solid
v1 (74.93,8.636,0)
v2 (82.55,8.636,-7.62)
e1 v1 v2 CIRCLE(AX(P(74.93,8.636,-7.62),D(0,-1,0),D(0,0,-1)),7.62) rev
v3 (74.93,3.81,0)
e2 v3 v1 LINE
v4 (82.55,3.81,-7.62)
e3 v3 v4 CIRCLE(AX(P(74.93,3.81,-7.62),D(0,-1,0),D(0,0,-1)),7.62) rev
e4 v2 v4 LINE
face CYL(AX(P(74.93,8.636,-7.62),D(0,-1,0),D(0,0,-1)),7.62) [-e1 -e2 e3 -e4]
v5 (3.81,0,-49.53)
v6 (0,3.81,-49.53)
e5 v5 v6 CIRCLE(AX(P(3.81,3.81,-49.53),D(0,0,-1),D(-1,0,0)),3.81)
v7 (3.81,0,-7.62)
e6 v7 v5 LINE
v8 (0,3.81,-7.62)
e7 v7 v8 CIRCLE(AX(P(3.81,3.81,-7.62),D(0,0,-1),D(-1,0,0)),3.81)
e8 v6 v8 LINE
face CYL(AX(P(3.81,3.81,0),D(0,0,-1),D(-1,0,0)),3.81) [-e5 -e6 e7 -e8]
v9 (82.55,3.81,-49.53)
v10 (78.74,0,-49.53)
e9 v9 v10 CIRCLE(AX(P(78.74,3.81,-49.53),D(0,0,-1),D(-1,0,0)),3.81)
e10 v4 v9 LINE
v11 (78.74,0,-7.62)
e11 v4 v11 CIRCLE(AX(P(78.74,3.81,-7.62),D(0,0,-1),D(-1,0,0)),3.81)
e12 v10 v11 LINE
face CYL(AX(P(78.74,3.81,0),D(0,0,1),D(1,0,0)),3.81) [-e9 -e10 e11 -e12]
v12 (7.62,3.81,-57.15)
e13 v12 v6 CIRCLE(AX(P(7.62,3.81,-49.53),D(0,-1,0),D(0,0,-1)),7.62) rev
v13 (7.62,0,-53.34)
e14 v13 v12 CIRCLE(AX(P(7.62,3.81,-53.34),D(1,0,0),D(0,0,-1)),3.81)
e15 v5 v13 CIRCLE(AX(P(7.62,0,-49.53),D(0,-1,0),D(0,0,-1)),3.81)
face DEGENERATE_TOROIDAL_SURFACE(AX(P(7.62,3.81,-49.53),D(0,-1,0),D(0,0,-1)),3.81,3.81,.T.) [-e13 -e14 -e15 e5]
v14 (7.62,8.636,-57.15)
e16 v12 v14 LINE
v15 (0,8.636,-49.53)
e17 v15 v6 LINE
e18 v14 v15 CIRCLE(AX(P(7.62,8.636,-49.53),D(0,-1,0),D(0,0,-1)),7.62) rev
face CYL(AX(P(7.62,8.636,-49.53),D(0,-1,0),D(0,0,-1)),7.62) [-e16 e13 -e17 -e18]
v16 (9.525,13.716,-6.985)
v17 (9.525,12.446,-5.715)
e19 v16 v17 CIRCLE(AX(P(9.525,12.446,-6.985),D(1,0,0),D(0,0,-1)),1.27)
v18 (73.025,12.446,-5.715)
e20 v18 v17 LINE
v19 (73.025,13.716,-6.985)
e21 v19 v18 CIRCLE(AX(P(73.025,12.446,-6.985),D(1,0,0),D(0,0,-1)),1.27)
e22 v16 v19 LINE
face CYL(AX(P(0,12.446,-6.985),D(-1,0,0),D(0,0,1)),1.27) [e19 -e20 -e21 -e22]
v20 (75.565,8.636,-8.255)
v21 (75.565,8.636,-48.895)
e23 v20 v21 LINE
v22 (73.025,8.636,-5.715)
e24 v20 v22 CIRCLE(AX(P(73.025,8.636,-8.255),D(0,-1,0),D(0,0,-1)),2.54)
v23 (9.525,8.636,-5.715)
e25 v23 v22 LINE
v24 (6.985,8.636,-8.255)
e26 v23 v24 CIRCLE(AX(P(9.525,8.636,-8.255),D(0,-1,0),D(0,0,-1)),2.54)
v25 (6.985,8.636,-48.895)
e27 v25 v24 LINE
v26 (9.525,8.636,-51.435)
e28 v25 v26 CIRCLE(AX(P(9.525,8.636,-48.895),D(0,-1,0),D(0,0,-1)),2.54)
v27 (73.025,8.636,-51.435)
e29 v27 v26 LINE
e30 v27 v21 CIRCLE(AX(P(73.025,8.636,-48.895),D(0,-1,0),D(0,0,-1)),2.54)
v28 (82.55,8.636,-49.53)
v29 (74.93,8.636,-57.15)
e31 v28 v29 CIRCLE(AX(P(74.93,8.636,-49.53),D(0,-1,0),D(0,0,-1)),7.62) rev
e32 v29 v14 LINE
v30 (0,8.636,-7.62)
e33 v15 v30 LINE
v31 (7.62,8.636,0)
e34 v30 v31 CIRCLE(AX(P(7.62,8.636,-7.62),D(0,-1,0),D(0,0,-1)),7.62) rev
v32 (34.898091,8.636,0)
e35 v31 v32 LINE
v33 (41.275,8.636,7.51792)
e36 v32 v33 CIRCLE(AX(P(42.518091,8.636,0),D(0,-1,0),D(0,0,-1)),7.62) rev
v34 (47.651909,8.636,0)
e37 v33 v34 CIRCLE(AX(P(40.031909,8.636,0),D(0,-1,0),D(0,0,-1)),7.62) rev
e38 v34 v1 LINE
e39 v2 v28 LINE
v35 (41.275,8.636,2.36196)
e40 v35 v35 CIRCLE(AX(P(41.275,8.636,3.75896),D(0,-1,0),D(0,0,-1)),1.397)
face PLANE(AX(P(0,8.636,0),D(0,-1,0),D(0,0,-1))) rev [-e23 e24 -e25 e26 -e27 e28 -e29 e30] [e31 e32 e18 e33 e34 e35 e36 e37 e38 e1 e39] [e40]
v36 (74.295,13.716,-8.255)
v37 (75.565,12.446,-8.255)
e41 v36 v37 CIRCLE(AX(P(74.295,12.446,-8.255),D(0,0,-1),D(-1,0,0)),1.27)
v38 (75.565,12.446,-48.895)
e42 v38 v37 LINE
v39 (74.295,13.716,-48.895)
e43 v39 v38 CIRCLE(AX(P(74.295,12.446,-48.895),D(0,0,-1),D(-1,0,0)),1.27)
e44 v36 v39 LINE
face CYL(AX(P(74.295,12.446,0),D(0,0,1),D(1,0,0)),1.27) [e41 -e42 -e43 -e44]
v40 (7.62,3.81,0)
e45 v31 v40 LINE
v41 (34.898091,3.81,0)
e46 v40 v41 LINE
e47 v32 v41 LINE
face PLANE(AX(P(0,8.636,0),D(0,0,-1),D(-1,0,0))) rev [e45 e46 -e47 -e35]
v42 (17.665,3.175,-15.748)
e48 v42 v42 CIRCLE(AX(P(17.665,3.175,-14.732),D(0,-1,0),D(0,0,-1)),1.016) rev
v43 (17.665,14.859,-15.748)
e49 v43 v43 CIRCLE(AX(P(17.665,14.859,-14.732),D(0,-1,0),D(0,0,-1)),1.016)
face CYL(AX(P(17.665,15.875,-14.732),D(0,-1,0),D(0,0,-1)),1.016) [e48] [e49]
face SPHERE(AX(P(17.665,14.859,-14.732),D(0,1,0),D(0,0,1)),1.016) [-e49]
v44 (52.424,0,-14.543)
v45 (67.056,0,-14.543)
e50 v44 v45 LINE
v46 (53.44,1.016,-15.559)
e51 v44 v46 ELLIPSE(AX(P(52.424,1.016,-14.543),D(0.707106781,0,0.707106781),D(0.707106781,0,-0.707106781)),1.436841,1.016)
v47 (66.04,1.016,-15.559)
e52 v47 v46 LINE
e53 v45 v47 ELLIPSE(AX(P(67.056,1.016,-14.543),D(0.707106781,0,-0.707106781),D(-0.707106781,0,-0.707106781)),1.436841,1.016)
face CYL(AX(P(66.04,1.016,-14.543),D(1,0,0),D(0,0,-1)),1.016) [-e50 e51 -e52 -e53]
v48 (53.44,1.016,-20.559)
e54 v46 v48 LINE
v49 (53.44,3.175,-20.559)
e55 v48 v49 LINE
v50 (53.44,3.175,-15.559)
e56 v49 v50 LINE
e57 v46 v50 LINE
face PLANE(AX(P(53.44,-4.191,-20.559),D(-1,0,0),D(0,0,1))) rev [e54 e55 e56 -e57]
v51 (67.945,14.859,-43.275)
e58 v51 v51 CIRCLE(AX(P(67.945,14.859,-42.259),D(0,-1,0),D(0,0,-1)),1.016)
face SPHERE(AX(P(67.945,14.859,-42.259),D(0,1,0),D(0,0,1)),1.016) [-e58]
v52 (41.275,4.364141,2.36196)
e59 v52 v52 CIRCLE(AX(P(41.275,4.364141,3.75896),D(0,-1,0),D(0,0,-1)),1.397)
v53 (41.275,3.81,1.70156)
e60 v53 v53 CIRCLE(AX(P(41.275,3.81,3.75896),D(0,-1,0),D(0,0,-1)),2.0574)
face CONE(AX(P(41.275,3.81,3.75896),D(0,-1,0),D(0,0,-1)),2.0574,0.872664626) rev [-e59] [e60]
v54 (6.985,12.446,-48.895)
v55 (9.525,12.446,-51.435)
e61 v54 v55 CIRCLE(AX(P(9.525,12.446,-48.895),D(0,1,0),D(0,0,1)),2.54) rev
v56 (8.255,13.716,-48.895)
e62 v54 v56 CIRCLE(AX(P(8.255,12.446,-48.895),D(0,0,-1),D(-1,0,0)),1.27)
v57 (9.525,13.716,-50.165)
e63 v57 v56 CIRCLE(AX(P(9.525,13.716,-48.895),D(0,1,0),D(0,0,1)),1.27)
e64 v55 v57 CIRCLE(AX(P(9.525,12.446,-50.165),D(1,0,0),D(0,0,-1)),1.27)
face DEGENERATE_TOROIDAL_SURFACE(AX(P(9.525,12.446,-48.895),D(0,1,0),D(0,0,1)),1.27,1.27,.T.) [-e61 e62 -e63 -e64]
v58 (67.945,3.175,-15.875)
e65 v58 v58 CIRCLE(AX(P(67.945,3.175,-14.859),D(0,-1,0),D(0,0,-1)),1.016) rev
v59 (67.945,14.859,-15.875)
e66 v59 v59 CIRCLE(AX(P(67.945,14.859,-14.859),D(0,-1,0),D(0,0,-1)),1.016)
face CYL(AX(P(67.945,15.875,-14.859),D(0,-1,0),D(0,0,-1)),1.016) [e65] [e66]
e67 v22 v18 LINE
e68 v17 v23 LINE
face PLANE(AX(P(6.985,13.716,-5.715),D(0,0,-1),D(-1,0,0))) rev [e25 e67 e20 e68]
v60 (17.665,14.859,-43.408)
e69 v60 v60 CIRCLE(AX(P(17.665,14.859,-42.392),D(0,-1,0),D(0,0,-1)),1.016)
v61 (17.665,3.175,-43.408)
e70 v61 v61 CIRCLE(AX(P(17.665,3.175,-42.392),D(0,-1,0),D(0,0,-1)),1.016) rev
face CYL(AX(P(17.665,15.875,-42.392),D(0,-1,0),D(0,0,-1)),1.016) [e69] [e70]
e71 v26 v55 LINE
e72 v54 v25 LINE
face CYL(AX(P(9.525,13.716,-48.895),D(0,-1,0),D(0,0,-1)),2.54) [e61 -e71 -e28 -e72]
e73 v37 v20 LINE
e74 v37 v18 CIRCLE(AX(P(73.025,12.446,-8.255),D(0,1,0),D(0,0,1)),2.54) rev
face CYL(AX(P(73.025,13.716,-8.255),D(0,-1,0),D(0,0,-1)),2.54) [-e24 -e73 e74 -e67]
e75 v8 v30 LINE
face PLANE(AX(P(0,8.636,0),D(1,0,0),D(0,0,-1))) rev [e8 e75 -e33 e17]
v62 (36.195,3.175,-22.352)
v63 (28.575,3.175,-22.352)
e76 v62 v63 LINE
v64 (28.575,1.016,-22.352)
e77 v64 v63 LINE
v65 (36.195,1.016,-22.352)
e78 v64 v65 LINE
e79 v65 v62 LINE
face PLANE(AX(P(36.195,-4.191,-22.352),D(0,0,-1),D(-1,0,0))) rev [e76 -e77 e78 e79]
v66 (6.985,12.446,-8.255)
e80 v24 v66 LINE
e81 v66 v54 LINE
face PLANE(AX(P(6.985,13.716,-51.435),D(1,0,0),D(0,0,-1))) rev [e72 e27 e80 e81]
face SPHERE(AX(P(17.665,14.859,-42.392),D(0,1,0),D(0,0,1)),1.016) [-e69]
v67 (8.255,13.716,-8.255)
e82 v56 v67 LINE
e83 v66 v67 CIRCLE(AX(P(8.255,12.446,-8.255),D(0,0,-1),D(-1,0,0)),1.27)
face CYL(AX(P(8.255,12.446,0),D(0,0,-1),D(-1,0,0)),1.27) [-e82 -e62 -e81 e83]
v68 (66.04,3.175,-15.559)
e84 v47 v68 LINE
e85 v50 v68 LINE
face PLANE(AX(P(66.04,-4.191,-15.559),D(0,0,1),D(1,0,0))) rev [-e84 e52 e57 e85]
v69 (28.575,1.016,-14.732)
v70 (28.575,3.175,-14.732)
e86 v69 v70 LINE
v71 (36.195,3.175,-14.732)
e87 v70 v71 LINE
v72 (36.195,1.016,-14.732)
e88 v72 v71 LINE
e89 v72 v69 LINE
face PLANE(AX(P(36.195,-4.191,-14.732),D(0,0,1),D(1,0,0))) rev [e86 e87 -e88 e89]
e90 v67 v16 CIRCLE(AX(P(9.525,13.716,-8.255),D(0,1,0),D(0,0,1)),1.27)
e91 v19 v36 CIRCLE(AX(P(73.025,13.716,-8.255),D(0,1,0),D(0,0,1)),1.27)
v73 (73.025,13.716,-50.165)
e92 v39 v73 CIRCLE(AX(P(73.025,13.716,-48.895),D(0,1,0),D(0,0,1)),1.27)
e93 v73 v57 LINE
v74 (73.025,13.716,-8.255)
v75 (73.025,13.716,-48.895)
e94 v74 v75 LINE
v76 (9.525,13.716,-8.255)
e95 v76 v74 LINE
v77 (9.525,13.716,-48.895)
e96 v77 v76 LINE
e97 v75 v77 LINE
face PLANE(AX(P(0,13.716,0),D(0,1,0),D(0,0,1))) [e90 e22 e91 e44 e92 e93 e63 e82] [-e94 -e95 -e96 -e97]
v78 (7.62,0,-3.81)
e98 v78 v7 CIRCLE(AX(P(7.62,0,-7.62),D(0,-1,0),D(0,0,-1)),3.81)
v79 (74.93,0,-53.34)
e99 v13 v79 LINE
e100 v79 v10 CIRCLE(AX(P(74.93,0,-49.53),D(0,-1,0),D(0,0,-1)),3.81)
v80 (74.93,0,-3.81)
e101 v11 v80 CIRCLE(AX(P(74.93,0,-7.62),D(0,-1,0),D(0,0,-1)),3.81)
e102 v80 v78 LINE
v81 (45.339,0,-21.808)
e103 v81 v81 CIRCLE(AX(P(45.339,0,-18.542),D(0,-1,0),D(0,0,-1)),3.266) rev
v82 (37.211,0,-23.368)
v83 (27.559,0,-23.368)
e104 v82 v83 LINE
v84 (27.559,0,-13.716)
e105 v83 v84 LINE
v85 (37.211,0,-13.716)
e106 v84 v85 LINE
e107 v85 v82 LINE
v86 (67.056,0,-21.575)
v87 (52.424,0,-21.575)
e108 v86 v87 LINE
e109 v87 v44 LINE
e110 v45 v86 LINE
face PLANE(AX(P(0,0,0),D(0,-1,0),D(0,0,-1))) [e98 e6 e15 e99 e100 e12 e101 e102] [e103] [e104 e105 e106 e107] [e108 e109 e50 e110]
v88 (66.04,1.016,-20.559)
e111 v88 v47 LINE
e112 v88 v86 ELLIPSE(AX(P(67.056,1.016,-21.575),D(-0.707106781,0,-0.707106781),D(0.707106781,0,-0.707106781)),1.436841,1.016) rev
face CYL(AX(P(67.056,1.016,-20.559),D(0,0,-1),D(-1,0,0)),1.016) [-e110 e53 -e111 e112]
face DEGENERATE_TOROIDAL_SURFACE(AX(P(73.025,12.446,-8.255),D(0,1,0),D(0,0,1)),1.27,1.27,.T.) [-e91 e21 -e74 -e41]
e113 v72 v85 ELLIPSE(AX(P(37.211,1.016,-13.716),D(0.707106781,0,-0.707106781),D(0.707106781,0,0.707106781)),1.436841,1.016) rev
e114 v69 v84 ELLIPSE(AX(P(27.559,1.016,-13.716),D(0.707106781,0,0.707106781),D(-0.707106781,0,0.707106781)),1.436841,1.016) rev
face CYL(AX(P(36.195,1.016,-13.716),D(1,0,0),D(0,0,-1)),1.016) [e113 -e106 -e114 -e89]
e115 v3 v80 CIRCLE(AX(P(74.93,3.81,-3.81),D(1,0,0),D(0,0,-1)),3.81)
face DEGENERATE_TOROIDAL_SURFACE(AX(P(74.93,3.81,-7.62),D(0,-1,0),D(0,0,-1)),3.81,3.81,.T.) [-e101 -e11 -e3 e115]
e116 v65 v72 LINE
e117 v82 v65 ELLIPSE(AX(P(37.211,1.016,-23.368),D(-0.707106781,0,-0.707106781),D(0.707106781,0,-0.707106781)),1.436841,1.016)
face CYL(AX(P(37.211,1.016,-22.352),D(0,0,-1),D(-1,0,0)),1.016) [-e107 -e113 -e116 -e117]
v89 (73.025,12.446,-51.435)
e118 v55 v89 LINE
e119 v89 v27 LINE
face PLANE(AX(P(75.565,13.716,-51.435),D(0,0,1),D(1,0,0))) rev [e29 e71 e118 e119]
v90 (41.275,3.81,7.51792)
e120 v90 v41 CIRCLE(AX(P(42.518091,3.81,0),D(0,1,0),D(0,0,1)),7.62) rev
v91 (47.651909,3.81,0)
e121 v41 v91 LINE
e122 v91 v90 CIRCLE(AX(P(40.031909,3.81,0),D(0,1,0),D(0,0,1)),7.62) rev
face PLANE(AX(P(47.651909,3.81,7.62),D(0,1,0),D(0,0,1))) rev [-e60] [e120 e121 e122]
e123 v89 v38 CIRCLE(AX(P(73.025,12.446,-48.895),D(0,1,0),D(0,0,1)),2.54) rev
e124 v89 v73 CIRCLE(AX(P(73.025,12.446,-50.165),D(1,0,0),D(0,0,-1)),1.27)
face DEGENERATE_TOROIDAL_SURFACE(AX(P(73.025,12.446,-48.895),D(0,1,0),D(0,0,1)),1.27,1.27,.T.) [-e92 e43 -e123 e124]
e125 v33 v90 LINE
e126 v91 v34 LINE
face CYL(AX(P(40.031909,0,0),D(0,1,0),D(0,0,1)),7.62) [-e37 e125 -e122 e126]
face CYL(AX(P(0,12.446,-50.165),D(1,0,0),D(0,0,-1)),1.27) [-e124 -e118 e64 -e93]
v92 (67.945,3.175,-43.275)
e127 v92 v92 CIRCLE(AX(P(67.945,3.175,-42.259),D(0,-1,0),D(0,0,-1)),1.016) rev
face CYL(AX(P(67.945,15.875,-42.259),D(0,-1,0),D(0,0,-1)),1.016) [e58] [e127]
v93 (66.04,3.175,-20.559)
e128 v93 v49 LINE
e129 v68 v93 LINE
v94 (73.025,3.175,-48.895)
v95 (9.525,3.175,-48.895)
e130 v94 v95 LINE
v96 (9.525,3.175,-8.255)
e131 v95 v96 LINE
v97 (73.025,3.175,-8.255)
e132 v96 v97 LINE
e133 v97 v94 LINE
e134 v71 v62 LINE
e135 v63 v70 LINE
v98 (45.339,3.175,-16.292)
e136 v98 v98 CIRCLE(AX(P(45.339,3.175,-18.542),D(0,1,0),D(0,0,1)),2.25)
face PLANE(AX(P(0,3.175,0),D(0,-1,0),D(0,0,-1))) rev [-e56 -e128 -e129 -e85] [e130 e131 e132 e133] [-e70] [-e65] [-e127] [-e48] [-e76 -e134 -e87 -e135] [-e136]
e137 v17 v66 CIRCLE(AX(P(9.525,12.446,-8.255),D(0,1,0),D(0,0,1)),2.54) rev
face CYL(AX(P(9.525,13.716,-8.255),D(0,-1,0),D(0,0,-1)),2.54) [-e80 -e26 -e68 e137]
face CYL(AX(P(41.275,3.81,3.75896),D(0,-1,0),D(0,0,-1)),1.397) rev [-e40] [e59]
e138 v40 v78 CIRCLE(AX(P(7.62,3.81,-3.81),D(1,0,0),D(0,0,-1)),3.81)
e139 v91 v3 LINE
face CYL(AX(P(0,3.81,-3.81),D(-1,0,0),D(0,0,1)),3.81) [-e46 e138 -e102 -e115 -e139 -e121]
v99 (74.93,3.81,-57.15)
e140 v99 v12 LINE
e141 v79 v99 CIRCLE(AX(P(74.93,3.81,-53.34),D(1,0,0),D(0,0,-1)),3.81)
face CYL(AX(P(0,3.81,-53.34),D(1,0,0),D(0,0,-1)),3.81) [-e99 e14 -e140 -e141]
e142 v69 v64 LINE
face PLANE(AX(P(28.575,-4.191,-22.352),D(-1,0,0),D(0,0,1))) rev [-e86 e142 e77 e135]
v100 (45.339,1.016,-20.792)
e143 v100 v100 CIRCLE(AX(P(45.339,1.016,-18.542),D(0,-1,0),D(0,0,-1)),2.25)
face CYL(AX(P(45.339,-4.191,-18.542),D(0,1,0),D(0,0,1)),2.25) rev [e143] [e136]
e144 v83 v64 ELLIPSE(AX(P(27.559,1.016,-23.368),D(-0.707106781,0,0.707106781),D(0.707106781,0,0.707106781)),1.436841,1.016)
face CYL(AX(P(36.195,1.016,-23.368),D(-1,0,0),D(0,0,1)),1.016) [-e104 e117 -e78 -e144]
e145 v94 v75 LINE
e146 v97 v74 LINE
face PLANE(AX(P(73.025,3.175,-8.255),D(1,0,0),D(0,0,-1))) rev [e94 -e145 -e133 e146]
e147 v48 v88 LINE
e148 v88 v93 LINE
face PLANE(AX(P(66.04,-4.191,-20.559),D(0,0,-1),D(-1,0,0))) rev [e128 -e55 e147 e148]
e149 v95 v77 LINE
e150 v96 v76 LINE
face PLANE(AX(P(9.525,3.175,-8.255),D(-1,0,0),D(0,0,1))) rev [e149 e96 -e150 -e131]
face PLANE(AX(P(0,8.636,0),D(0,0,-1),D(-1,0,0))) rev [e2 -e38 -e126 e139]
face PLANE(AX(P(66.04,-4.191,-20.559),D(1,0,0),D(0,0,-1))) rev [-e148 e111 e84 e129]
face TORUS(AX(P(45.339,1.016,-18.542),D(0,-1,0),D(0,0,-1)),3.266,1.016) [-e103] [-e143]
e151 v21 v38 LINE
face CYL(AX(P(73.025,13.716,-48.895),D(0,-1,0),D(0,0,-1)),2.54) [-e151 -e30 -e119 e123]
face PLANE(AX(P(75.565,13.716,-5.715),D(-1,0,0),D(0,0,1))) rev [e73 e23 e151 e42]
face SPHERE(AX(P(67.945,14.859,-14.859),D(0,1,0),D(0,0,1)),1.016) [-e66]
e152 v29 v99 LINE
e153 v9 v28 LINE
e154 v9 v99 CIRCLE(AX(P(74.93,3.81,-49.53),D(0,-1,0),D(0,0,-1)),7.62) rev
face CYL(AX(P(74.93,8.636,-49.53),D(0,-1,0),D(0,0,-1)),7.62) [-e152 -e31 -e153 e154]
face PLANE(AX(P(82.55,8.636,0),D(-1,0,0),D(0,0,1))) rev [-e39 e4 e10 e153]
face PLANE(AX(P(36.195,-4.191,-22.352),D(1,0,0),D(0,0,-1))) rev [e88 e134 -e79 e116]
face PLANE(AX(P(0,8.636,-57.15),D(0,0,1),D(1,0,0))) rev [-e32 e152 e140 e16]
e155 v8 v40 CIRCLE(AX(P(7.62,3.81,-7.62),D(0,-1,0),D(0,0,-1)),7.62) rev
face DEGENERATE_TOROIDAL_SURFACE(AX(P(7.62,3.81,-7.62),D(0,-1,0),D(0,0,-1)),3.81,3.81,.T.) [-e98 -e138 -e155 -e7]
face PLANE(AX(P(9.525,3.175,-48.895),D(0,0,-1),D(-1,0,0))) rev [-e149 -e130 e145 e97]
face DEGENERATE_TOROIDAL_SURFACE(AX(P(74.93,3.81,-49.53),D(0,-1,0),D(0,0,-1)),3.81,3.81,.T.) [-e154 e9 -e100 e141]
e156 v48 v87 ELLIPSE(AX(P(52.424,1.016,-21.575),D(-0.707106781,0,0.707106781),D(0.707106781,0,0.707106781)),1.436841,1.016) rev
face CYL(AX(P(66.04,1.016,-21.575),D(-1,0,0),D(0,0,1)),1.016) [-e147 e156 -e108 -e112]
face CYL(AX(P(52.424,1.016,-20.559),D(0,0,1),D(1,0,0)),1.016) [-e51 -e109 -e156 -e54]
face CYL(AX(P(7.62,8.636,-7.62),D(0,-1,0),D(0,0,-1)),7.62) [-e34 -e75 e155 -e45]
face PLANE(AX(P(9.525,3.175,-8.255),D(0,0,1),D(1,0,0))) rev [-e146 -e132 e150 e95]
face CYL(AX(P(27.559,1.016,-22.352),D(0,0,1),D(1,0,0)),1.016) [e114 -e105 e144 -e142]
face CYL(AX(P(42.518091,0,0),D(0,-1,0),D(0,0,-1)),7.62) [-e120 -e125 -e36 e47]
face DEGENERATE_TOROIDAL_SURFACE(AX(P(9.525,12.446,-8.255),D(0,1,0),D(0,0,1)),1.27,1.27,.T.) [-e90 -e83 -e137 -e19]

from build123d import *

# Parameters (mm, degrees)
SKETCH1_W                       = 82.55
SKETCH1_H                       = 57.15
BOSS_EXTRUDE1_DEPTH             = 8.636
FILLET2_R                       = 7.62
FILLET3_R                       = 3.81
SKETCH2_W                       = 63.5
SKETCH2_H                       = 40.64
CUT_EXTRUDE1_DEPTH              = 5.461
SKETCH7_W                       = 68.58
SKETCH7_H                       = 45.72
BOSS_EXTRUDE3_DEPTH             = 5.08
SKETCH8_W                       = 63.5
SKETCH8_H                       = 40.64
CUT_EXTRUDE3_DEPTH              = 5.08
SKETCH5_R                       = 1.016
BOSS_EXTRUDE4_DEPTH             = 12.7
SKETCH4_R                       = 2.25
SKETCH4_W                       = 12.6
SKETCH4_H                       = 5
SKETCH4_W_2                     = 7.62
SKETCH4_H_2                     = 7.62
CUT_EXTRUDE2_DEPTH              = 7.366
FILLET7_R                       = 1.016
FILLET8_R                       = 2.54
SKETCH9_W                       = 12.753817634
SKETCH9_H                       = 4.826
BOSS_EXTRUDE5_DEPTH             = 7.62
FILLET10_R                      = 7.62
FILLET11_R                      = 1.27
FILLET12_R                      = 1.016
F_4_40_TAPPED_HOLE2_D           = 2.794
F_4_40_TAPPED_HOLE2_DEPTH       = 7.62
F_4_40_TAPPED_HOLE2_CSINK_D     = 4.1148
F_4_40_TAPPED_HOLE2_CSINK_ANGLE = 100
F_4_40_TAPPED_HOLE2_TIP         = 0.839402285
FILLET13_R                      = 1.016


with BuildPart() as part:
    # Sketch1 → Boss-Extrude1 (new body)
    with BuildSketch(Plane(origin=(0, 0, 0), x_dir=(1, 0, 0), z_dir=(0, 1, 0))):
        with Locations((41.275, 28.575)):
            Rectangle(SKETCH1_W, SKETCH1_H)
    extrude(amount=BOSS_EXTRUDE1_DEPTH)

    # Fillet2
    fillet2_edges = [part.edges().sort_by_distance(p)[0] for p in [
        (0, 4.318, -57.15),
        (82.55, 4.318, -57.15),
        (82.55, 4.318, 0),
        (0, 4.318, 0),
    ]]
    fillet(fillet2_edges, radius=FILLET2_R)

    # Fillet3
    fillet3_edges = [part.edges().sort_by_distance(p)[0] for p in [
        (41.275, 0, -57.15),
        (0, 0, -28.575),
        (82.55, 0, -28.575),
        (41.275, 0, 0),
        (2.231846327, 0, -54.918153673),
        (2.231846327, 0, -2.231846327),
        (80.318153673, 0, -2.231846327),
        (80.318153673, 0, -54.918153673),
    ]]
    fillet(fillet3_edges, radius=FILLET3_R)

    # Sketch2 → Cut-Extrude1 (cut)
    with BuildSketch(Plane(origin=(0, 8.636, 0), x_dir=(1, 0, 0), z_dir=(0, 1, 0))):
        with Locations((41.275, 28.575)):
            Rectangle(SKETCH2_W, SKETCH2_H)
    extrude(amount=-CUT_EXTRUDE1_DEPTH, mode=Mode.SUBTRACT)

    # Sketch7 → Boss-Extrude3 (add)
    with BuildSketch(Plane(origin=(0, 8.636, 0), x_dir=(1, 0, 0), z_dir=(0, 1, 0))):
        with Locations((41.275, 28.575)):
            Rectangle(SKETCH7_W, SKETCH7_H)
    extrude(amount=BOSS_EXTRUDE3_DEPTH)

    # Sketch8 → Cut-Extrude3 (cut)
    with BuildSketch(Plane(origin=(0, 13.716, 0), x_dir=(1, 0, 0), z_dir=(0, 1, 0))):
        with Locations((41.275, 28.575)):
            Rectangle(SKETCH8_W, SKETCH8_H)
    extrude(amount=-CUT_EXTRUDE3_DEPTH, mode=Mode.SUBTRACT)

    # Sketch5 → Boss-Extrude4 (add)
    with BuildSketch(Plane(origin=(0, 3.175, 0), x_dir=(1, 0, 0), z_dir=(0, 1, 0))):
        with Locations(Location((17.665, 42.392, 0), (0, 0, 90))):
            Circle(SKETCH5_R)
        with Locations(Location((17.665, 14.732, 0), (0, 0, 90))):
            Circle(SKETCH5_R)
        with Locations(Location((67.945, 42.259, 0), (0, 0, 90))):
            Circle(SKETCH5_R)
        with Locations(Location((67.945, 14.859, 0), (0, 0, 90))):
            Circle(SKETCH5_R)
    extrude(amount=BOSS_EXTRUDE4_DEPTH)

    # Sketch4 → Cut-Extrude2 (cut)
    with BuildSketch(Plane(origin=(0, 3.175, 0), x_dir=(1, 0, 0), z_dir=(0, 1, 0))):
        with Locations(Location((45.339, 18.542, 0), (0, 0, 270))):
            Circle(SKETCH4_R)
        with Locations((59.74, 18.059)):
            Rectangle(SKETCH4_W, SKETCH4_H)
        with Locations((32.385, 18.542)):
            Rectangle(SKETCH4_W_2, SKETCH4_H_2)
    extrude(amount=-CUT_EXTRUDE2_DEPTH, mode=Mode.SUBTRACT)

    # Fillet7
    fillet7_edges = [part.edges().sort_by_distance(p)[0] for p in [
        (17.665, 15.875, -41.376),
        (17.665, 15.875, -13.716),
        (67.945, 15.875, -41.243),
    ]]
    fillet(fillet7_edges, radius=FILLET7_R)

    # Fillet8
    fillet8_edges = [part.edges().sort_by_distance(p)[0] for p in [
        (75.565, 11.176, -51.435),
        (6.985, 11.176, -51.435),
        (6.985, 11.176, -5.715),
        (75.565, 11.176, -5.715),
    ]]
    fillet(fillet8_edges, radius=FILLET8_R)

    # Sketch9 → Boss-Extrude5 (add)
    with BuildSketch(Plane.XY):
        with Locations((41.275, 6.223)):
            Rectangle(SKETCH9_W, SKETCH9_H)
    extrude(amount=BOSS_EXTRUDE5_DEPTH)

    # Fillet10
    # the kernel refuses this fillet: 7.62 mm, written as the material it takes off along each edge
    with BuildSketch(Plane(origin=(47.651908817, -15.24, 7.62), x_dir=(0, 0, -1), z_dir=(0, 1, 0)), Plane(origin=(34.898091183, 27.686, 7.62), x_dir=(0, 0, -1), z_dir=(0, -1, 0))) as fillet10_piece_1:
        with BuildLine():
            CenterArc((FILLET10_R, FILLET10_R), FILLET10_R, 180, 90)
            Line((0, FILLET10_R), (0, 0))
            Line((0, 0), (FILLET10_R, 0))
        make_face()
    extrude(amount=42.926, mode=Mode.SUBTRACT)

    # Fillet11
    fillet11_edges = [part.edges().sort_by_distance(p)[0] for p in [
        (41.275, 13.716, -51.435),
        (75.565, 13.716, -28.575),
        (6.985, 13.716, -28.575),
        (41.275, 13.716, -5.715),
        (7.728948776, 13.716, -50.691051224),
        (7.728948776, 13.716, -6.458948776),
        (74.821051224, 13.716, -6.458948776),
        (74.821051224, 13.716, -50.691051224),
    ]]
    fillet(fillet11_edges, radius=FILLET11_R)

    # Fillet12
    fillet12_edges = [part.edges().sort_by_distance(p)[0] for p in [
        (67.945, 15.875, -13.843),
    ]]
    fillet(fillet12_edges, radius=FILLET12_R)

    # #4-40 Tapped Hole2
    with Locations(Plane(origin=(0, 3.81, 0), x_dir=(-1, 0, 0), z_dir=(0, -1, 0))):
        with Locations((-41.275, -3.758960106)):
            CounterSinkHole(F_4_40_TAPPED_HOLE2_D / 2, F_4_40_TAPPED_HOLE2_CSINK_D / 2, depth=F_4_40_TAPPED_HOLE2_DEPTH, counter_sink_angle=F_4_40_TAPPED_HOLE2_CSINK_ANGLE)
            with Locations((0, 0, -(F_4_40_TAPPED_HOLE2_DEPTH + F_4_40_TAPPED_HOLE2_TIP / 2))):  # 118° drill point
                Cone(0, F_4_40_TAPPED_HOLE2_D / 2, F_4_40_TAPPED_HOLE2_TIP, mode=Mode.SUBTRACT)

    # Fillet13
    fillet13_edges = [part.edges().sort_by_distance(p)[0] for p in [
        (45.339, 0, -20.792),
        (32.385, 0, -14.732),
        (36.195, 0, -18.542),
        (32.385, 0, -22.352),
        (28.575, 0, -18.542),
        (59.74, 0, -15.559),
        (66.04, 0, -18.059),
        (59.74, 0, -20.559),
        (53.44, 0, -18.059),
    ]]
    fillet(fillet13_edges, radius=FILLET13_R)


solid = part.part
